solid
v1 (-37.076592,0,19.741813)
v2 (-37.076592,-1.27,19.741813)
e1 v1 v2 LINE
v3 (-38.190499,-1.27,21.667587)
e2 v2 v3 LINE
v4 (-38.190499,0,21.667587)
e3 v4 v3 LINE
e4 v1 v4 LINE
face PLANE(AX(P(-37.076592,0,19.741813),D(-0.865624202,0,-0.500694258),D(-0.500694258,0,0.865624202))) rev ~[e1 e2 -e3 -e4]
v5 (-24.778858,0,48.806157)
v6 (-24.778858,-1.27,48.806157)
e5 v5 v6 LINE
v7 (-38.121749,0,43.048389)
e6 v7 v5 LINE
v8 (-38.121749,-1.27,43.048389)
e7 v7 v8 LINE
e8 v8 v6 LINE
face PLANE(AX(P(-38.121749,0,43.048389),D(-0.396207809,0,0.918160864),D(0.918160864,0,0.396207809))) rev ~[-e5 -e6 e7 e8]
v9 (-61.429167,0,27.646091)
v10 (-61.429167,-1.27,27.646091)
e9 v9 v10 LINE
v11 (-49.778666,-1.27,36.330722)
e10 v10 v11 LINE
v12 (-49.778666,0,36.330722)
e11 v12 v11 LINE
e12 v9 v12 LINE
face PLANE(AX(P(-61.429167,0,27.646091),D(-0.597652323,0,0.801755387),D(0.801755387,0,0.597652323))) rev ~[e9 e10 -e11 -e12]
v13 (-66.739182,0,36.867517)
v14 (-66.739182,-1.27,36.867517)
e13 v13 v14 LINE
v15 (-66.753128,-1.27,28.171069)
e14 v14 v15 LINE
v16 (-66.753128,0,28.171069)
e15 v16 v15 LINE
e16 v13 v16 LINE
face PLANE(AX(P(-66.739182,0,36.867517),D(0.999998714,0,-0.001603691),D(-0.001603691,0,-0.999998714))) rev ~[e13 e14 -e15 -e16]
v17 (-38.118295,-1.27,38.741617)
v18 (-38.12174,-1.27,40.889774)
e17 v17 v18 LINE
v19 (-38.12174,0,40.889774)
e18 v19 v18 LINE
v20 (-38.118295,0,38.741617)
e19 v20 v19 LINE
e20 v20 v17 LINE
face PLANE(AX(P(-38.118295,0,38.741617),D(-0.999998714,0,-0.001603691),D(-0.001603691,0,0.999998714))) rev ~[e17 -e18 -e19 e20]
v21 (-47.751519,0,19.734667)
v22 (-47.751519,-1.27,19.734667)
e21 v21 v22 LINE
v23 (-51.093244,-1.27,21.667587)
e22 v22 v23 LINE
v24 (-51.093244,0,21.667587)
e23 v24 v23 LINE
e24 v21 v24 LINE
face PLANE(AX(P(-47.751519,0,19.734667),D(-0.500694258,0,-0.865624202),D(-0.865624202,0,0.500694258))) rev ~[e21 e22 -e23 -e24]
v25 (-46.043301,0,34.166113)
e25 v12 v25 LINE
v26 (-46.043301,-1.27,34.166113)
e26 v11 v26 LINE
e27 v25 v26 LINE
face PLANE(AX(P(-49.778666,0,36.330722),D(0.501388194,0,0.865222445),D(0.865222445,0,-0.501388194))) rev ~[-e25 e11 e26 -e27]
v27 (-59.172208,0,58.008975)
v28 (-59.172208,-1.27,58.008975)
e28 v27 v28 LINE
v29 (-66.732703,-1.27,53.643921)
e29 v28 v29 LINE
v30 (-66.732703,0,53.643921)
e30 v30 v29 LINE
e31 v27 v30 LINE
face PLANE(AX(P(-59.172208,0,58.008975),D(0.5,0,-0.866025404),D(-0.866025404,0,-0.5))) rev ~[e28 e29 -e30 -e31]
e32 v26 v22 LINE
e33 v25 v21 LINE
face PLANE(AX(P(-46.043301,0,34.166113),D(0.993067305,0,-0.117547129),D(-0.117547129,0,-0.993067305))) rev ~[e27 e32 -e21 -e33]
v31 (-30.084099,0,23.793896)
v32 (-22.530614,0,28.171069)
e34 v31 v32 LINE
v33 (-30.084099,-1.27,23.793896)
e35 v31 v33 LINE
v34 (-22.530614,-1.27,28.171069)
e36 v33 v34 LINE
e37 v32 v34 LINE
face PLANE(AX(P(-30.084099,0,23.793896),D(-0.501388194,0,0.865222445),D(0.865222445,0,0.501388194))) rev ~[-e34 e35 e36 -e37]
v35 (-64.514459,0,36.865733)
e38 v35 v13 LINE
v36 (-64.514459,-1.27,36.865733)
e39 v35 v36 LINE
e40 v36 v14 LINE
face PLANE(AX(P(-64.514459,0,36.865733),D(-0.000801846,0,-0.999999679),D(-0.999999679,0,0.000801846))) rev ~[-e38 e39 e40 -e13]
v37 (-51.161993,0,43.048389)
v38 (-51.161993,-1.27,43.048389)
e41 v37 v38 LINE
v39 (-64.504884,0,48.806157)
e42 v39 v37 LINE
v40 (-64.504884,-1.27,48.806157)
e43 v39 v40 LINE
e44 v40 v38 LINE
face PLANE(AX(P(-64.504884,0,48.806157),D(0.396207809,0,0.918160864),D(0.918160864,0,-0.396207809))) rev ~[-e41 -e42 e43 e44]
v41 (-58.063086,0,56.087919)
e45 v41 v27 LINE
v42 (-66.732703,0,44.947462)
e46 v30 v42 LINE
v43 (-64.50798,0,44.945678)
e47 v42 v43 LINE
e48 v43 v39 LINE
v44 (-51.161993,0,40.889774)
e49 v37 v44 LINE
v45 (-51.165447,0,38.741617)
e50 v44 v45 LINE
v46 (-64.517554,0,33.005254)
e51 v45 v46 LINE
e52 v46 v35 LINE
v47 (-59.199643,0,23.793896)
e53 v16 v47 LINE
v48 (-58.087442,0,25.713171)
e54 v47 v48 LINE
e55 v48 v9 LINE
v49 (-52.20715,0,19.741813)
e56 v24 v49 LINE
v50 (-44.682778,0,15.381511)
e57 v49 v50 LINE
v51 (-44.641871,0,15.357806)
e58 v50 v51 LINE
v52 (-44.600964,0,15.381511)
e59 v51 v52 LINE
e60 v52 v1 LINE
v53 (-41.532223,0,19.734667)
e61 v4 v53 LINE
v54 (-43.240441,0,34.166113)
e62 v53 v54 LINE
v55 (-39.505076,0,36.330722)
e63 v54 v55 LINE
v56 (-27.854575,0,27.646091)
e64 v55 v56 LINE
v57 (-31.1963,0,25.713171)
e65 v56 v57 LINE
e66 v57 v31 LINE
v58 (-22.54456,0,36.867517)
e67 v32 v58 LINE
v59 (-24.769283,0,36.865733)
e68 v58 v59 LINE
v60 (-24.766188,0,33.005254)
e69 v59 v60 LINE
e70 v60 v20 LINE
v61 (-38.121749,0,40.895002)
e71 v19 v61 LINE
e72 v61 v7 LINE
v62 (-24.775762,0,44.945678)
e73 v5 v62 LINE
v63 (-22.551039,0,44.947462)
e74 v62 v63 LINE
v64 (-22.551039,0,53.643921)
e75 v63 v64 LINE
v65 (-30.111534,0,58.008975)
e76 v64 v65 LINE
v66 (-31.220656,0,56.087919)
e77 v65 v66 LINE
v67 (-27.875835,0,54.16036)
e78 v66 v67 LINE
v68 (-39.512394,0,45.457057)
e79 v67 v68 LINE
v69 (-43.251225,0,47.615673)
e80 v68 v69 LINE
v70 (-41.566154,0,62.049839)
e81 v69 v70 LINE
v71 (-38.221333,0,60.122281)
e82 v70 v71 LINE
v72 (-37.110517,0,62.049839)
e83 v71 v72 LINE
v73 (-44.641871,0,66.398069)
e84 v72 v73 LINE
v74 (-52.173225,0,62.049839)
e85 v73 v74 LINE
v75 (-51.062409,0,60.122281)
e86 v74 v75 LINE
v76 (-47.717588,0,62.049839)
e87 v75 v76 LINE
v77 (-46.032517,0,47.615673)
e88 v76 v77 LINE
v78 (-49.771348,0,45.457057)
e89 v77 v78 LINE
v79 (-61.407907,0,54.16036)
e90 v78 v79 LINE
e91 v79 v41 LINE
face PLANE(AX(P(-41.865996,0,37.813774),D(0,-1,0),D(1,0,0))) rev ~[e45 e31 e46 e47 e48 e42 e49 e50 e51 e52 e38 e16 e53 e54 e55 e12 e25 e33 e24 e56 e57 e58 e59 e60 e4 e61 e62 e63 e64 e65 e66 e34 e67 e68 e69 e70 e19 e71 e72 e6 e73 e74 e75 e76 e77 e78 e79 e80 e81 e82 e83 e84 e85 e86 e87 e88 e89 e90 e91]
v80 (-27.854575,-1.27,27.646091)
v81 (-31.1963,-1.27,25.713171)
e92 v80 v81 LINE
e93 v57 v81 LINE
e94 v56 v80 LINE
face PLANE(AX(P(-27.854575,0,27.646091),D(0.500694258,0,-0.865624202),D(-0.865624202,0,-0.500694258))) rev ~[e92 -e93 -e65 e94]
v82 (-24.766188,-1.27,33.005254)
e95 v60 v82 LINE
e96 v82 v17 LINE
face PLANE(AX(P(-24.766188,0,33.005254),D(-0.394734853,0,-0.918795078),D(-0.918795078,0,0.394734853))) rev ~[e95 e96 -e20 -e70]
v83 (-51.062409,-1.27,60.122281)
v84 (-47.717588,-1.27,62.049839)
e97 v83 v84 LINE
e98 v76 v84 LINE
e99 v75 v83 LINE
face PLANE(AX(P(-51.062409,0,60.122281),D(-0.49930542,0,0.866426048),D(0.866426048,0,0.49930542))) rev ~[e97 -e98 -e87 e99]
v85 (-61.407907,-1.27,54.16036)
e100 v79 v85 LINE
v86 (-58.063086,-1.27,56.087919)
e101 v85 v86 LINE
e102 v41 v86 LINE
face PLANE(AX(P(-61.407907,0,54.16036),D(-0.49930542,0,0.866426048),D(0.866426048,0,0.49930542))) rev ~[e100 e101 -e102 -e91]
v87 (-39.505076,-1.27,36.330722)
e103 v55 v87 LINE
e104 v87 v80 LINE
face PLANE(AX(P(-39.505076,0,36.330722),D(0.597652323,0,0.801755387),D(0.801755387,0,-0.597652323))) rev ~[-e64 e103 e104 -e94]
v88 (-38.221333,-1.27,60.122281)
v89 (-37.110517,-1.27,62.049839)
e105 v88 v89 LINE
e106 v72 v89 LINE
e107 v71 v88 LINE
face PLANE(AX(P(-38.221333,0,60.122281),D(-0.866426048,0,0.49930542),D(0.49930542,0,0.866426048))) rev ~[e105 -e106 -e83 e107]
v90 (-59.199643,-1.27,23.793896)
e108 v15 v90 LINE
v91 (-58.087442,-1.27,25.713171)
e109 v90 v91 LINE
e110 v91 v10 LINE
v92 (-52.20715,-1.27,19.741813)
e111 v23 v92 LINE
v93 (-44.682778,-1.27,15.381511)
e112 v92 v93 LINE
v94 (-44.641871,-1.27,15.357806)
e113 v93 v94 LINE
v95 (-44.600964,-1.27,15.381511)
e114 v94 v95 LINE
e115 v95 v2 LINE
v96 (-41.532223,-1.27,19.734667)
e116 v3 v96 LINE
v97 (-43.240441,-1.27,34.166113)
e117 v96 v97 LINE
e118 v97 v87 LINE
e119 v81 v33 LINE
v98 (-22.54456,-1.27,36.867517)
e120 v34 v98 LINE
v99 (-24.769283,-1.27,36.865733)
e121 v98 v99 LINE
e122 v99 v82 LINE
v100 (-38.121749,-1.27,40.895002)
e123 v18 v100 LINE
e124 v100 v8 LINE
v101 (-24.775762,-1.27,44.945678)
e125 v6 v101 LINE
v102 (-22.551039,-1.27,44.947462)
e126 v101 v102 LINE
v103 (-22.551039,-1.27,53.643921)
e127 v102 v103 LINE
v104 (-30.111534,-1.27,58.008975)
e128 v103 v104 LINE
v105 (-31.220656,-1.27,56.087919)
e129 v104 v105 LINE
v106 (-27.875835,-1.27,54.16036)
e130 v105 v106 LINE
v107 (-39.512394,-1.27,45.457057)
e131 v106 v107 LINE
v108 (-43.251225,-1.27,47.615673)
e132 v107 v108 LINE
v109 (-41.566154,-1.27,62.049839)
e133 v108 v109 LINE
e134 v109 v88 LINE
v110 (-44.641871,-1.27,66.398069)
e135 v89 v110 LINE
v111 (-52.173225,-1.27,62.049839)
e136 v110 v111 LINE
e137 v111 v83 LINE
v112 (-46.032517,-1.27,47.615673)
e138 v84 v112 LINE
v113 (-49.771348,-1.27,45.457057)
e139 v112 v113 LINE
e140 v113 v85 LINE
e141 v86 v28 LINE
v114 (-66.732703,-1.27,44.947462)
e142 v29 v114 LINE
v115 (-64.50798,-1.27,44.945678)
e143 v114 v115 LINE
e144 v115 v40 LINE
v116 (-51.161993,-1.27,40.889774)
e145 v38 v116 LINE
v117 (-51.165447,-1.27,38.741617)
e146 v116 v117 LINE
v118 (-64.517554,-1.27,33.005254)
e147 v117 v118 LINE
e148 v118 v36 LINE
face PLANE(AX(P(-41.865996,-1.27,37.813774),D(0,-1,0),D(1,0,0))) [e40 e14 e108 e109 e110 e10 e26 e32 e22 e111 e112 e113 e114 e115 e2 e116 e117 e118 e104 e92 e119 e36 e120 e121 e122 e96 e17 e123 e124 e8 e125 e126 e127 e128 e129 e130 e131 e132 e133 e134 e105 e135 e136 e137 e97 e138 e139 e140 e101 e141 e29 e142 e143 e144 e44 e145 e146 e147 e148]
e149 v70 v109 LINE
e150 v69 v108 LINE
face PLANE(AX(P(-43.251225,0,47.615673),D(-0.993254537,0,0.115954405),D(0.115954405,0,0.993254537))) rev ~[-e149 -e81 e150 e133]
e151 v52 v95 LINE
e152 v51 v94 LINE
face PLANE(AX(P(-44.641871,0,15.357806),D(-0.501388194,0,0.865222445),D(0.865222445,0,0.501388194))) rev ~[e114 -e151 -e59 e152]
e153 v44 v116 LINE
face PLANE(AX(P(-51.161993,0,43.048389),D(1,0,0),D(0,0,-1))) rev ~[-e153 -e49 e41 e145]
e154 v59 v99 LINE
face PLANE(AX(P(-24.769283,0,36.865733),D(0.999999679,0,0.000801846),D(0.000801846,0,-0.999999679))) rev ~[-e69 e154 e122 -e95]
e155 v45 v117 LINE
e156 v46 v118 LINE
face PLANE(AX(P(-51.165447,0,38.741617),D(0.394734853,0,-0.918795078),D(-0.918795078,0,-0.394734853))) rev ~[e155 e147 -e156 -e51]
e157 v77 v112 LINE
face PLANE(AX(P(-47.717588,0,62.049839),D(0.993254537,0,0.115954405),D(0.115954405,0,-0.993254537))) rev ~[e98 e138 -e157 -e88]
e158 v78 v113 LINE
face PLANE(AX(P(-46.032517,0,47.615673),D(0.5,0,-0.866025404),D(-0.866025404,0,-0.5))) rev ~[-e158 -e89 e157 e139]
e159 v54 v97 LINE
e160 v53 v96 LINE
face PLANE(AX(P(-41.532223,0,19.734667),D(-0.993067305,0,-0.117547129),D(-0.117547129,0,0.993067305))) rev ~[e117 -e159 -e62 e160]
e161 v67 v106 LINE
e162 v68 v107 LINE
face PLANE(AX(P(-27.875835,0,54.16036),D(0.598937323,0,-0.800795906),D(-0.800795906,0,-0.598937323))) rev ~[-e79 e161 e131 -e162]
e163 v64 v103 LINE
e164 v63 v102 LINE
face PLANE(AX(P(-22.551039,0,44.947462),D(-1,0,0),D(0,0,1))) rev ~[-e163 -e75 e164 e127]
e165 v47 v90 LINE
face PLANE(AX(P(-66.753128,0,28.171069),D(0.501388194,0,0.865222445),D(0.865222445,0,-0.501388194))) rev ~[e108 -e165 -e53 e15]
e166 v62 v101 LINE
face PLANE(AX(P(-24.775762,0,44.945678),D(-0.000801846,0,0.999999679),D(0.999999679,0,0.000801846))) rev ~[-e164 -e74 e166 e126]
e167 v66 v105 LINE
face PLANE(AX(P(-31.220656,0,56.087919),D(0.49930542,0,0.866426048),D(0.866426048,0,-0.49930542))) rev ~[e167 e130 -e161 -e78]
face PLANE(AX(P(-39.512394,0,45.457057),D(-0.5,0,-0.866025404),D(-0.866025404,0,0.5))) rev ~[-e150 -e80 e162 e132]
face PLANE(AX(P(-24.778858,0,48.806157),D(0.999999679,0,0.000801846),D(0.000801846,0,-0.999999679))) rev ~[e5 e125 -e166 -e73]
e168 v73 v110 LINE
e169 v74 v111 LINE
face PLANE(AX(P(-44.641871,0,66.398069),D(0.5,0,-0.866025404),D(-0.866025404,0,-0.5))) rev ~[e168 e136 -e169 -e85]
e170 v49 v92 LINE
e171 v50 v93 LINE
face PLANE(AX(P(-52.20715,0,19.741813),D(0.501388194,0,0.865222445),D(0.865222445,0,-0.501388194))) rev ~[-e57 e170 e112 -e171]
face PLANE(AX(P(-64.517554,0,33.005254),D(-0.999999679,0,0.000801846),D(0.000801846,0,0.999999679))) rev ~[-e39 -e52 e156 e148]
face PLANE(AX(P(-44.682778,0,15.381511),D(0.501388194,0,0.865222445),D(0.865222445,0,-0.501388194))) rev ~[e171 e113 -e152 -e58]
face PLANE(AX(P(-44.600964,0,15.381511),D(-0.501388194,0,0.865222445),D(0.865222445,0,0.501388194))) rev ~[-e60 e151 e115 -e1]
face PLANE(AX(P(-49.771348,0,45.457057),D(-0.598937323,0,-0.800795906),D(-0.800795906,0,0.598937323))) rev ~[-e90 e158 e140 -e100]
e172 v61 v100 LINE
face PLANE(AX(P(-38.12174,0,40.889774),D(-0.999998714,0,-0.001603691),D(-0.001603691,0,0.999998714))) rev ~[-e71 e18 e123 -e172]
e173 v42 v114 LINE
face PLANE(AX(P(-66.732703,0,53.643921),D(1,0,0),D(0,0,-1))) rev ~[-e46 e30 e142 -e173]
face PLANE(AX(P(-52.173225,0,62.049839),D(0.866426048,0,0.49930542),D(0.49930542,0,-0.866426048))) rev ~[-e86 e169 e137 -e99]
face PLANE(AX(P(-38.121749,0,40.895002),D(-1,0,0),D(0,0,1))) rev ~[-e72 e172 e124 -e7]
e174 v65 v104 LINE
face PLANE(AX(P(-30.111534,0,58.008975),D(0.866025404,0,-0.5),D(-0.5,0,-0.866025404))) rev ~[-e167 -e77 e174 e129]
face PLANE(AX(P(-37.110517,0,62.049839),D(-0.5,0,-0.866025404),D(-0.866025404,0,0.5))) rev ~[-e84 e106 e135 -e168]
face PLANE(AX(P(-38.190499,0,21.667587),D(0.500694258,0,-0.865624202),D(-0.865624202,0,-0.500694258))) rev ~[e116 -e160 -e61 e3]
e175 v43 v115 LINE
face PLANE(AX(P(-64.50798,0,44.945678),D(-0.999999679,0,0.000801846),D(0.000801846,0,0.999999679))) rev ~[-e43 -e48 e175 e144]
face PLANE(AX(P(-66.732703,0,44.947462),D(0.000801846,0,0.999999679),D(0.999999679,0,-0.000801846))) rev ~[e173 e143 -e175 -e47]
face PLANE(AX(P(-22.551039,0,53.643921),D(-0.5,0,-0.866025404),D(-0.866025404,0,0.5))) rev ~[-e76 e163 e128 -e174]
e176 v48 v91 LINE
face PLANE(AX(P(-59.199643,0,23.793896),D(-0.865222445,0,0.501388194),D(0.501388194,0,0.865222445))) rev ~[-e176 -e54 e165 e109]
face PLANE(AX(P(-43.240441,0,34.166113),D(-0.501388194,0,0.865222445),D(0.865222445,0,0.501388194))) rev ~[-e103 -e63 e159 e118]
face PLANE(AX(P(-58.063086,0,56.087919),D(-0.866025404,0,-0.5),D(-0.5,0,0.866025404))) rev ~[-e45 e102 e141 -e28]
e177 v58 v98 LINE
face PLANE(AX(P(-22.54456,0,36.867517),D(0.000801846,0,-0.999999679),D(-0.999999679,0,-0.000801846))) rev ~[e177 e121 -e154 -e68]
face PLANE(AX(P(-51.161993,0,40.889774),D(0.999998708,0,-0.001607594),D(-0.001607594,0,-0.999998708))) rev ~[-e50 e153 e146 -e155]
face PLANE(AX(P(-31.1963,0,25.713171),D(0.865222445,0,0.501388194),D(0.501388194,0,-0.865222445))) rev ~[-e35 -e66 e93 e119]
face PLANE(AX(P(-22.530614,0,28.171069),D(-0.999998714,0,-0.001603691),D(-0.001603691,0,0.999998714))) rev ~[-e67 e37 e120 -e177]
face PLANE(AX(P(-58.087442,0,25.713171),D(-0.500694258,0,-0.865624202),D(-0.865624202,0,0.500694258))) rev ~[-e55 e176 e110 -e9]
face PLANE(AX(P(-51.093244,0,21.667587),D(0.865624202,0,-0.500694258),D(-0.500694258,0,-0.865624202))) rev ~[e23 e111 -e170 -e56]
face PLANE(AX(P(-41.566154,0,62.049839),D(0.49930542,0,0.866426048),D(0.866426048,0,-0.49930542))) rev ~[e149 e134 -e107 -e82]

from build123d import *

# Parameters (mm, degrees)
F1_DEPTH = 1.27


# Not quite as in the source:
# - ends of sketch curves that miss each other by under 0.0002 mm in the source are joined


with BuildPart() as f1:
    # F0 (on Front) → F1 (new body)
    with BuildSketch(Plane.XZ):
        Polygon((-44.6418710053, 40.8897735178), (-44.6418710053, 33.3539977979), (-44.6297971524, 33.3609944811), (-43.2404409197, 34.166113231), (-39.5050764062, 36.3307215128), (-38.1157201735, 37.1358402628), (-38.1182953477, 38.7416174302), (-38.1217403313, 40.8897735313), (-38.1217487156, 40.8950016529), align=None)
        Polygon((-44.6539448582, 33.3609944811), (-44.6418710053, 33.3539977979), (-44.6418710053, 40.8897735178), (-51.161993295, 40.8950016529), (-51.161993295, 40.8897735178), (-51.1654466629, 38.7416174302), (-51.1680218371, 37.1358402628), (-49.7786656044, 36.3307215128), (-46.0433010909, 34.166113231), align=None)
        Polygon((-44.6418710053, 40.8897735178), (-38.1217487156, 40.8950016529), (-38.1217487156, 40.9002297812), (-38.1217487156, 43.0483886446), (-38.1217487156, 44.6541678769), (-39.5123943237, 45.4570574931), (-43.2512253972, 47.6156726199), (-44.6418710053, 48.418562236), align=None)
        Polygon((-51.161993295, 40.8950016529), (-44.6418710053, 40.8897735178), (-44.6418710053, 48.418562236), (-46.0325166134, 47.6156726199), (-49.7713476869, 45.4570574931), (-51.161993295, 44.6541678769), (-51.161993295, 43.0483886446), (-51.161993295, 40.9002297812), align=None)
        Polygon((-41.5661535928, 62.0498394063), (-44.6418710053, 63.8223188678), (-44.6418710053, 48.418562236), (-43.2512253972, 47.6156726199), align=None)
        Polygon((-44.6418710053, 48.418562236), (-44.6418710053, 63.8223188678), (-47.7175884178, 62.0498394063), (-46.0325166134, 47.6156726199), align=None)
        Polygon((-37.1105166727, 62.0498394063), (-44.6418710053, 66.3980688576), (-44.6418710053, 63.8223188678), (-41.5661535928, 62.0498394063), (-38.2213332575, 60.1222808724), align=None)
        Polygon((-44.6418710053, 63.8223188678), (-44.6418710053, 66.3980688576), (-52.1732253379, 62.0498394063), (-51.0624087531, 60.1222808724), (-47.7175884178, 62.0498394063), align=None)
        Polygon((-24.7788576939, 48.806157048), (-24.7757621839, 44.9456783996), (-22.5510392338, 44.9474622851), (-22.5510392338, 53.6439211877), (-30.1115337683, 58.0089747424), (-31.2206558067, 56.0879190201), (-27.8758354714, 54.1603604862), (-24.7817211845, 52.3772792439), align=None)
        Polygon((-38.1217487156, 43.0483886446), (-24.7788576939, 48.806157048), (-24.7817211845, 52.3772792439), (-27.8758354714, 54.1603604862), (-39.5123943237, 45.4570574931), (-38.1217487156, 44.6541678769), align=None)
        Polygon((-22.5445603606, 36.8675168429), (-24.7692833106, 36.8657329574), (-24.7661878006, 33.0052543089), (-24.76332431, 29.4341321131), (-27.8545751064, 27.6460911595), (-31.1962999317, 25.713171045), (-30.0840985392, 23.7938964823), (-22.5306139252, 28.1710691232), align=None)
        Polygon((-24.76332431, 29.4341321131), (-24.7661878006, 33.0052543089), (-38.1182953477, 38.7416174302), (-38.1157201735, 37.1358402628), (-39.5050764062, 36.3307215128), (-27.8545751064, 27.6460911595), align=None)
        Polygon((-44.6827784364, 15.3815109795), (-44.6418710053, 15.3578055115), (-44.6418710053, 33.3539977979), (-44.6539448582, 33.3609944811), (-46.0433010909, 34.166113231), (-47.7515186761, 19.7346673406), (-51.0932435014, 21.6675874551), (-52.2071498666, 19.7418128067), align=None)
        Polygon((-44.6418710053, 33.3539977979), (-44.6418710053, 15.3578055115), (-44.6009635742, 15.3815109795), (-37.076592144, 19.7418128067), (-38.1904985092, 21.6675874551), (-41.5322233345, 19.7346673406), (-43.2404409197, 34.166113231), (-44.6297971524, 33.3609944811), align=None)
        Polygon((-51.1654466629, 38.7416174302), (-64.5175542099, 33.0052543089), (-64.5204177006, 29.4341321131), (-61.4291669042, 27.6460911595), (-49.7786656044, 36.3307215128), (-51.1680218371, 37.1358402628), align=None)
        Polygon((-64.5144587, 36.8657329574), (-66.73918165, 36.8675168429), (-66.7531280854, 28.1710691232), (-59.1996434714, 23.7938964823), (-58.0874420789, 25.713171045), (-61.4291669042, 27.6460911595), (-64.5204177006, 29.4341321131), (-64.5175542099, 33.0052543089), align=None)
        Polygon((-64.5020208261, 52.3772792439), (-64.5048843167, 48.806157048), (-51.161993295, 43.0483886446), (-51.161993295, 44.6541678769), (-49.7713476869, 45.4570574931), (-61.4079065392, 54.1603604862), align=None)
        Polygon((-58.0630862039, 56.0879190201), (-59.1722082423, 58.0089747424), (-66.7327027768, 53.6439211877), (-66.7327027768, 44.9474622851), (-64.5079798267, 44.9456783996), (-64.5048843167, 48.806157048), (-64.5020208261, 52.3772792439), (-61.4079065392, 54.1603604862), align=None)
    extrude(amount=F1_DEPTH)


solid = f1.part
